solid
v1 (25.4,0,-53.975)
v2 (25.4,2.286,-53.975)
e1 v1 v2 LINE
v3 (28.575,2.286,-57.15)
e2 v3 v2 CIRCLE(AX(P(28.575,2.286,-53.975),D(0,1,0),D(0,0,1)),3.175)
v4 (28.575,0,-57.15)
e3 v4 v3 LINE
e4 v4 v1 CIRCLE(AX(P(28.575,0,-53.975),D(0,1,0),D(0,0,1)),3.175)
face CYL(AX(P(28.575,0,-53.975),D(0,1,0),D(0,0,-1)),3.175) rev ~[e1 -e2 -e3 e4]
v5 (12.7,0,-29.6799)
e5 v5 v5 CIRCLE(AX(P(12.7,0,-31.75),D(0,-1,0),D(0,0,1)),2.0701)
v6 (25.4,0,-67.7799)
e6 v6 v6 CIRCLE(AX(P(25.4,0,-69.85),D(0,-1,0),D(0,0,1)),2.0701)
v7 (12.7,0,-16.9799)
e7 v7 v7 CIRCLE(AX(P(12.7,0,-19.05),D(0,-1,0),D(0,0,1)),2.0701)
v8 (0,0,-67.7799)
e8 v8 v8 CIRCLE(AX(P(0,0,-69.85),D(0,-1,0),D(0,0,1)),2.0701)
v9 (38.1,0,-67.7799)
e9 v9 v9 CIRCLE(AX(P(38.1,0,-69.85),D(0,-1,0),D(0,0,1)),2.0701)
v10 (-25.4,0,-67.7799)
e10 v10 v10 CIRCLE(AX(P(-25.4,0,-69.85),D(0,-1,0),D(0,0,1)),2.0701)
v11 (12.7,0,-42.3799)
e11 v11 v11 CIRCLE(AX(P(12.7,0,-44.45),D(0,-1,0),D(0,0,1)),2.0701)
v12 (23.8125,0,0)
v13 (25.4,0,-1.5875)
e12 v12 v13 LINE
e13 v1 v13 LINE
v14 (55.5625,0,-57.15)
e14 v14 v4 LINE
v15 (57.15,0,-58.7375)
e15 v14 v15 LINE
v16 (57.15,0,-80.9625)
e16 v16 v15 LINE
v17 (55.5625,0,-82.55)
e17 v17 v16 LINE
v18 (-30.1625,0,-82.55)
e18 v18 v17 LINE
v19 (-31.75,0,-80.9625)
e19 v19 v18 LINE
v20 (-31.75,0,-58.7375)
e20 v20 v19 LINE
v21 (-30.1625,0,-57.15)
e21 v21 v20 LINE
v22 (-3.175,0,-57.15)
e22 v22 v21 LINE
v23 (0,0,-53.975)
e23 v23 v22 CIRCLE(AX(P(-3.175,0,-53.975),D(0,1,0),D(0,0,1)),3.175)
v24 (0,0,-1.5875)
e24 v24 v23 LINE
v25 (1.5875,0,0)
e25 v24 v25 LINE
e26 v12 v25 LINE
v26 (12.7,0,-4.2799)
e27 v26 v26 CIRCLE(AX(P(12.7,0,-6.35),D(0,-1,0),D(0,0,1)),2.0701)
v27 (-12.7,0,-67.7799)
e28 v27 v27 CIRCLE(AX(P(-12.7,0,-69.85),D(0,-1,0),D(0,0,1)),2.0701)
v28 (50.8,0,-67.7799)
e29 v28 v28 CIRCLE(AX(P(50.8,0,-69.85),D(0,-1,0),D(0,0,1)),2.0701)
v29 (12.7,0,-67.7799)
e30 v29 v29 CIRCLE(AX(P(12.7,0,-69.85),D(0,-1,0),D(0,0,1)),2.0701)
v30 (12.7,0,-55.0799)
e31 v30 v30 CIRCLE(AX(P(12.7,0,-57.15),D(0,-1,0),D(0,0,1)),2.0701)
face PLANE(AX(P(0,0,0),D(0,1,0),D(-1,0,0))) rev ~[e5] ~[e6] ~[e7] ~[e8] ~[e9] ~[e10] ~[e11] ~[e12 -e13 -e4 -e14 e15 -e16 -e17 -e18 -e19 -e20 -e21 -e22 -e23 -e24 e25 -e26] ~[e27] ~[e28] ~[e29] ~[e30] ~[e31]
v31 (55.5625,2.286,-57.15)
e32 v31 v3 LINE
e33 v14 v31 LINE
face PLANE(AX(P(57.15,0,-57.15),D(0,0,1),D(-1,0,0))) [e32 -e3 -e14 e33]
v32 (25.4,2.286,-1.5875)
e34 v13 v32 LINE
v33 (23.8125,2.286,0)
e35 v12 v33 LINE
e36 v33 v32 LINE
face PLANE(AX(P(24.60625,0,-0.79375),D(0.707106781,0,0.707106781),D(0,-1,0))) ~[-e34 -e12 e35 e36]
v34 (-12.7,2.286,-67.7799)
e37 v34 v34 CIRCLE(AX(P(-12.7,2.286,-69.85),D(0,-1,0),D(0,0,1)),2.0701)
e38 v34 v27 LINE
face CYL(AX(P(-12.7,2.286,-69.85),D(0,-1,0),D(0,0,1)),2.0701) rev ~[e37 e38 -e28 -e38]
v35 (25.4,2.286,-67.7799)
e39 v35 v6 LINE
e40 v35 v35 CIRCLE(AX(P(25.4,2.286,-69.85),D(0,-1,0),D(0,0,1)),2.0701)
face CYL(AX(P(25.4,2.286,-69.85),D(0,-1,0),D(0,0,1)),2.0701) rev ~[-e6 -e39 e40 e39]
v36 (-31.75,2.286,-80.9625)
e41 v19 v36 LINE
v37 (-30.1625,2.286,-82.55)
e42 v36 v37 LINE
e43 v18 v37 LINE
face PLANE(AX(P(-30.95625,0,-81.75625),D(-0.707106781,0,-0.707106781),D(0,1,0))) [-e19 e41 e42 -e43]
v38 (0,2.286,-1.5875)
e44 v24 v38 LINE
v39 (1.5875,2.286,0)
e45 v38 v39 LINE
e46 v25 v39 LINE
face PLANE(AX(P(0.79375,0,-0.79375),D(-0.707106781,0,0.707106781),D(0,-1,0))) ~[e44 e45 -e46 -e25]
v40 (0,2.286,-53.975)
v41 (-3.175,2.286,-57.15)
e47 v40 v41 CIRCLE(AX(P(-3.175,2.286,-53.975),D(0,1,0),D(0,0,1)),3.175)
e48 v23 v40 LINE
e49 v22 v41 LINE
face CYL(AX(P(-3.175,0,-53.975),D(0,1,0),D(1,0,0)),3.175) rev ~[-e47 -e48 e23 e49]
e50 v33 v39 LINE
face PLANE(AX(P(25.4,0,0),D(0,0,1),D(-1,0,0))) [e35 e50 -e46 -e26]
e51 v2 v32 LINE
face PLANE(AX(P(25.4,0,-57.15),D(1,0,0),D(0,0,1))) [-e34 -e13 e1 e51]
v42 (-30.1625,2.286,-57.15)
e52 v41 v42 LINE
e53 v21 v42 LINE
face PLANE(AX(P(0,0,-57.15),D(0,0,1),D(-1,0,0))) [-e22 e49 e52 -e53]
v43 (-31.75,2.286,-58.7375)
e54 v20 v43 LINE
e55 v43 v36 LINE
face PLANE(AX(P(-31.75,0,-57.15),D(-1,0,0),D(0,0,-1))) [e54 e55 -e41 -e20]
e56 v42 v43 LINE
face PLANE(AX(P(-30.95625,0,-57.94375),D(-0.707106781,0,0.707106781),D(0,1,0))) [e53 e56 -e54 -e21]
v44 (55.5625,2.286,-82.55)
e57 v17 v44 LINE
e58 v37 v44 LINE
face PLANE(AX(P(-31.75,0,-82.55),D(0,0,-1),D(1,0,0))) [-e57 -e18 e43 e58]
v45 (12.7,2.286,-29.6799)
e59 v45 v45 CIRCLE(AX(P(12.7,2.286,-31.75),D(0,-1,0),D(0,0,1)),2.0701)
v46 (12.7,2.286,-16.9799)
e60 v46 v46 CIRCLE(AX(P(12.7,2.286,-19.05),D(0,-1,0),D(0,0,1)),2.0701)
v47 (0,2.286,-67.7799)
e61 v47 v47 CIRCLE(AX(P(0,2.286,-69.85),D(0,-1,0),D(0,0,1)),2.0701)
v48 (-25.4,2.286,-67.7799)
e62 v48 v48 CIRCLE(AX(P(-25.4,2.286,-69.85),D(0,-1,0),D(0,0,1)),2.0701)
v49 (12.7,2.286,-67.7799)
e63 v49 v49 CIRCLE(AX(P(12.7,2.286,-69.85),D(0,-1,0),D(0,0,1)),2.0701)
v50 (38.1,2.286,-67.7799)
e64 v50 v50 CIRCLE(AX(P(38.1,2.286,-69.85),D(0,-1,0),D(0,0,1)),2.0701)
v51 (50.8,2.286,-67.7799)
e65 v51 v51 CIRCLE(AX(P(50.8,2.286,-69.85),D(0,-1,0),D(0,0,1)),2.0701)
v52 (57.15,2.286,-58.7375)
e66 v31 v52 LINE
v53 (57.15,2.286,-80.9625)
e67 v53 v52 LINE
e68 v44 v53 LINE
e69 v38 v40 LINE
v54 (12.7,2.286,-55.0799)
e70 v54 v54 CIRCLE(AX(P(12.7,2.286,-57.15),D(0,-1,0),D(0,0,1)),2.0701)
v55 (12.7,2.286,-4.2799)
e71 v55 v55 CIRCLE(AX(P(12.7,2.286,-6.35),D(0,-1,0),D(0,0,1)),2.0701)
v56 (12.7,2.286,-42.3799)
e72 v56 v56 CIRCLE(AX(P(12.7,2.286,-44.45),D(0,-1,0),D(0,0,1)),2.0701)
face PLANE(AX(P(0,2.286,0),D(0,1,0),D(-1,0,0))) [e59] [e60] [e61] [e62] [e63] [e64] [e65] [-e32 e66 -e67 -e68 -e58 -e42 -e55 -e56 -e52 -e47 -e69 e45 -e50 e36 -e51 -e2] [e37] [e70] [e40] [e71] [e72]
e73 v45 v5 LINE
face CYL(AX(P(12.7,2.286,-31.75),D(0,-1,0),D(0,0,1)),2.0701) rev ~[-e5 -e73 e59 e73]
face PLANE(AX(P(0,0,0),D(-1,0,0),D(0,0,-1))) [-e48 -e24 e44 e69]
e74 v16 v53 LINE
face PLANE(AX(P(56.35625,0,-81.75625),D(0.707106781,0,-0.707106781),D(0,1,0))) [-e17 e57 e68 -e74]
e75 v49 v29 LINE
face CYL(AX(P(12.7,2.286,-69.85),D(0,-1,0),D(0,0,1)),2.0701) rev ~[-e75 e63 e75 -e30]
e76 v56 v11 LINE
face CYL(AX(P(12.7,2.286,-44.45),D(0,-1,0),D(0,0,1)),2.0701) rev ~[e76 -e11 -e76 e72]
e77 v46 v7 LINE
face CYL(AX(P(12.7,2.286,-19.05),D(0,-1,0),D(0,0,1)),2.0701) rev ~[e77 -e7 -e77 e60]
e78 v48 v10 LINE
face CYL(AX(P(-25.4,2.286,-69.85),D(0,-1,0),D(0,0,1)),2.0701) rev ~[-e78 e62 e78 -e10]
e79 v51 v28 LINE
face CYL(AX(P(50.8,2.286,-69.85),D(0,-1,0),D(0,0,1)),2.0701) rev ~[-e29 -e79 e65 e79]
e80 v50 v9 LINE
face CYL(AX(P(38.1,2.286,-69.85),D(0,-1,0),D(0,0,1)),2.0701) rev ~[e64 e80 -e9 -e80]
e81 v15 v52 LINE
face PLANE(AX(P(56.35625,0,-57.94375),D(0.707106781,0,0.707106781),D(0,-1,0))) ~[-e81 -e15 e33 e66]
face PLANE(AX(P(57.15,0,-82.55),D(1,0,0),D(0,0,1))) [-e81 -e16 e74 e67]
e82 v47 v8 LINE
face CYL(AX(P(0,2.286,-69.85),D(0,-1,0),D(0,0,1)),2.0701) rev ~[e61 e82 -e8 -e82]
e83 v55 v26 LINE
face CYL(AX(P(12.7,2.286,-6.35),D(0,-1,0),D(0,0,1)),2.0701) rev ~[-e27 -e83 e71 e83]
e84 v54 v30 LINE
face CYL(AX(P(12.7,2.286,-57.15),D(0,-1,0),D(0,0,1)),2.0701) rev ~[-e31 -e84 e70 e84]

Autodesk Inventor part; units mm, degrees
ref_plane "YZ Plane" through (0, 0, 0) normal (1, 0, 0) x (0, 1, 0)
ref_plane "XZ Plane" through (0, 0, 0) normal (0, 1, 0) x (-1, 0, 0)
ref_plane "XY Plane" through (0, 0, 0) normal (0, 0, 1) x (1, 0, 0)
sketch "Sketch1" plane through (0, 0, 0) normal (0, 1, 0) x (-1, 0, 0)
  line L0 (0, 0) -> (0, -57.15)
  line L1 (0, -57.15) -> (31.75, -57.15)
  line L2 (31.75, -57.15) -> (31.75, -82.55)
  line L3 (31.75, -82.55) -> (-57.15, -82.55)
  line L4 (-57.15, -82.55) -> (-57.15, -57.15)
  line L5 (-57.15, -57.15) -> (-25.4, -57.15)
  line L6 (-25.4, -57.15) -> (-25.4, 0)
  line L7 (-25.4, 0) -> (0, 0)
  dimension "d0" = 88.9
  dimension "d1" = 25.4
  dimension "d2" = 25.4
  dimension "d3" = 31.75
  dimension "d4" = 82.55
extrude "Extrusion1" add sketch "Sketch1" along normal blind 2.286
fillet "Fillet1" radius 3.175 2 edges at (25.4, 1.143, -57.15) (0, 1.143, -57.15)
chamfer "Chamfer1" distance 1.5875 angle 45 6 edges at (0, 1.143, 0) (25.4, 1.143, 0) (57.15, 1.143, -57.15) (57.15, 1.143, -82.55) (-31.75, 1.143, -57.15) (-31.75, 1.143, -82.55)
sketch "Sketch2" plane through (0, 2.286, 0) normal (0, 1, 0) x (1, 0, 0)
  line L0 (55.5625, 82.55) -> (-30.1625, 82.55) projected
  line L1 (25.4, 1.5875) -> (25.4, 53.975) projected
  point P0 (0, 0)
  point P1 (12.7, 69.85)
  dimension "d11" = 12.7
  dimension "d12" = 12.7
hole "Hole1" at (12.7, 2.286, -69.85) direction (0, -1, 0) diameter 4.1402 end through all
pattern_linear "Rectangular Pattern1" count 6 spacing 12.7 along (0, 0, 1) of "Hole1"
pattern_linear "Rectangular Pattern2" count 7 spacing 12.7 along (-1, 0, 0) of "Hole1" first direction both ways yes
properties part number "T Gusset"
